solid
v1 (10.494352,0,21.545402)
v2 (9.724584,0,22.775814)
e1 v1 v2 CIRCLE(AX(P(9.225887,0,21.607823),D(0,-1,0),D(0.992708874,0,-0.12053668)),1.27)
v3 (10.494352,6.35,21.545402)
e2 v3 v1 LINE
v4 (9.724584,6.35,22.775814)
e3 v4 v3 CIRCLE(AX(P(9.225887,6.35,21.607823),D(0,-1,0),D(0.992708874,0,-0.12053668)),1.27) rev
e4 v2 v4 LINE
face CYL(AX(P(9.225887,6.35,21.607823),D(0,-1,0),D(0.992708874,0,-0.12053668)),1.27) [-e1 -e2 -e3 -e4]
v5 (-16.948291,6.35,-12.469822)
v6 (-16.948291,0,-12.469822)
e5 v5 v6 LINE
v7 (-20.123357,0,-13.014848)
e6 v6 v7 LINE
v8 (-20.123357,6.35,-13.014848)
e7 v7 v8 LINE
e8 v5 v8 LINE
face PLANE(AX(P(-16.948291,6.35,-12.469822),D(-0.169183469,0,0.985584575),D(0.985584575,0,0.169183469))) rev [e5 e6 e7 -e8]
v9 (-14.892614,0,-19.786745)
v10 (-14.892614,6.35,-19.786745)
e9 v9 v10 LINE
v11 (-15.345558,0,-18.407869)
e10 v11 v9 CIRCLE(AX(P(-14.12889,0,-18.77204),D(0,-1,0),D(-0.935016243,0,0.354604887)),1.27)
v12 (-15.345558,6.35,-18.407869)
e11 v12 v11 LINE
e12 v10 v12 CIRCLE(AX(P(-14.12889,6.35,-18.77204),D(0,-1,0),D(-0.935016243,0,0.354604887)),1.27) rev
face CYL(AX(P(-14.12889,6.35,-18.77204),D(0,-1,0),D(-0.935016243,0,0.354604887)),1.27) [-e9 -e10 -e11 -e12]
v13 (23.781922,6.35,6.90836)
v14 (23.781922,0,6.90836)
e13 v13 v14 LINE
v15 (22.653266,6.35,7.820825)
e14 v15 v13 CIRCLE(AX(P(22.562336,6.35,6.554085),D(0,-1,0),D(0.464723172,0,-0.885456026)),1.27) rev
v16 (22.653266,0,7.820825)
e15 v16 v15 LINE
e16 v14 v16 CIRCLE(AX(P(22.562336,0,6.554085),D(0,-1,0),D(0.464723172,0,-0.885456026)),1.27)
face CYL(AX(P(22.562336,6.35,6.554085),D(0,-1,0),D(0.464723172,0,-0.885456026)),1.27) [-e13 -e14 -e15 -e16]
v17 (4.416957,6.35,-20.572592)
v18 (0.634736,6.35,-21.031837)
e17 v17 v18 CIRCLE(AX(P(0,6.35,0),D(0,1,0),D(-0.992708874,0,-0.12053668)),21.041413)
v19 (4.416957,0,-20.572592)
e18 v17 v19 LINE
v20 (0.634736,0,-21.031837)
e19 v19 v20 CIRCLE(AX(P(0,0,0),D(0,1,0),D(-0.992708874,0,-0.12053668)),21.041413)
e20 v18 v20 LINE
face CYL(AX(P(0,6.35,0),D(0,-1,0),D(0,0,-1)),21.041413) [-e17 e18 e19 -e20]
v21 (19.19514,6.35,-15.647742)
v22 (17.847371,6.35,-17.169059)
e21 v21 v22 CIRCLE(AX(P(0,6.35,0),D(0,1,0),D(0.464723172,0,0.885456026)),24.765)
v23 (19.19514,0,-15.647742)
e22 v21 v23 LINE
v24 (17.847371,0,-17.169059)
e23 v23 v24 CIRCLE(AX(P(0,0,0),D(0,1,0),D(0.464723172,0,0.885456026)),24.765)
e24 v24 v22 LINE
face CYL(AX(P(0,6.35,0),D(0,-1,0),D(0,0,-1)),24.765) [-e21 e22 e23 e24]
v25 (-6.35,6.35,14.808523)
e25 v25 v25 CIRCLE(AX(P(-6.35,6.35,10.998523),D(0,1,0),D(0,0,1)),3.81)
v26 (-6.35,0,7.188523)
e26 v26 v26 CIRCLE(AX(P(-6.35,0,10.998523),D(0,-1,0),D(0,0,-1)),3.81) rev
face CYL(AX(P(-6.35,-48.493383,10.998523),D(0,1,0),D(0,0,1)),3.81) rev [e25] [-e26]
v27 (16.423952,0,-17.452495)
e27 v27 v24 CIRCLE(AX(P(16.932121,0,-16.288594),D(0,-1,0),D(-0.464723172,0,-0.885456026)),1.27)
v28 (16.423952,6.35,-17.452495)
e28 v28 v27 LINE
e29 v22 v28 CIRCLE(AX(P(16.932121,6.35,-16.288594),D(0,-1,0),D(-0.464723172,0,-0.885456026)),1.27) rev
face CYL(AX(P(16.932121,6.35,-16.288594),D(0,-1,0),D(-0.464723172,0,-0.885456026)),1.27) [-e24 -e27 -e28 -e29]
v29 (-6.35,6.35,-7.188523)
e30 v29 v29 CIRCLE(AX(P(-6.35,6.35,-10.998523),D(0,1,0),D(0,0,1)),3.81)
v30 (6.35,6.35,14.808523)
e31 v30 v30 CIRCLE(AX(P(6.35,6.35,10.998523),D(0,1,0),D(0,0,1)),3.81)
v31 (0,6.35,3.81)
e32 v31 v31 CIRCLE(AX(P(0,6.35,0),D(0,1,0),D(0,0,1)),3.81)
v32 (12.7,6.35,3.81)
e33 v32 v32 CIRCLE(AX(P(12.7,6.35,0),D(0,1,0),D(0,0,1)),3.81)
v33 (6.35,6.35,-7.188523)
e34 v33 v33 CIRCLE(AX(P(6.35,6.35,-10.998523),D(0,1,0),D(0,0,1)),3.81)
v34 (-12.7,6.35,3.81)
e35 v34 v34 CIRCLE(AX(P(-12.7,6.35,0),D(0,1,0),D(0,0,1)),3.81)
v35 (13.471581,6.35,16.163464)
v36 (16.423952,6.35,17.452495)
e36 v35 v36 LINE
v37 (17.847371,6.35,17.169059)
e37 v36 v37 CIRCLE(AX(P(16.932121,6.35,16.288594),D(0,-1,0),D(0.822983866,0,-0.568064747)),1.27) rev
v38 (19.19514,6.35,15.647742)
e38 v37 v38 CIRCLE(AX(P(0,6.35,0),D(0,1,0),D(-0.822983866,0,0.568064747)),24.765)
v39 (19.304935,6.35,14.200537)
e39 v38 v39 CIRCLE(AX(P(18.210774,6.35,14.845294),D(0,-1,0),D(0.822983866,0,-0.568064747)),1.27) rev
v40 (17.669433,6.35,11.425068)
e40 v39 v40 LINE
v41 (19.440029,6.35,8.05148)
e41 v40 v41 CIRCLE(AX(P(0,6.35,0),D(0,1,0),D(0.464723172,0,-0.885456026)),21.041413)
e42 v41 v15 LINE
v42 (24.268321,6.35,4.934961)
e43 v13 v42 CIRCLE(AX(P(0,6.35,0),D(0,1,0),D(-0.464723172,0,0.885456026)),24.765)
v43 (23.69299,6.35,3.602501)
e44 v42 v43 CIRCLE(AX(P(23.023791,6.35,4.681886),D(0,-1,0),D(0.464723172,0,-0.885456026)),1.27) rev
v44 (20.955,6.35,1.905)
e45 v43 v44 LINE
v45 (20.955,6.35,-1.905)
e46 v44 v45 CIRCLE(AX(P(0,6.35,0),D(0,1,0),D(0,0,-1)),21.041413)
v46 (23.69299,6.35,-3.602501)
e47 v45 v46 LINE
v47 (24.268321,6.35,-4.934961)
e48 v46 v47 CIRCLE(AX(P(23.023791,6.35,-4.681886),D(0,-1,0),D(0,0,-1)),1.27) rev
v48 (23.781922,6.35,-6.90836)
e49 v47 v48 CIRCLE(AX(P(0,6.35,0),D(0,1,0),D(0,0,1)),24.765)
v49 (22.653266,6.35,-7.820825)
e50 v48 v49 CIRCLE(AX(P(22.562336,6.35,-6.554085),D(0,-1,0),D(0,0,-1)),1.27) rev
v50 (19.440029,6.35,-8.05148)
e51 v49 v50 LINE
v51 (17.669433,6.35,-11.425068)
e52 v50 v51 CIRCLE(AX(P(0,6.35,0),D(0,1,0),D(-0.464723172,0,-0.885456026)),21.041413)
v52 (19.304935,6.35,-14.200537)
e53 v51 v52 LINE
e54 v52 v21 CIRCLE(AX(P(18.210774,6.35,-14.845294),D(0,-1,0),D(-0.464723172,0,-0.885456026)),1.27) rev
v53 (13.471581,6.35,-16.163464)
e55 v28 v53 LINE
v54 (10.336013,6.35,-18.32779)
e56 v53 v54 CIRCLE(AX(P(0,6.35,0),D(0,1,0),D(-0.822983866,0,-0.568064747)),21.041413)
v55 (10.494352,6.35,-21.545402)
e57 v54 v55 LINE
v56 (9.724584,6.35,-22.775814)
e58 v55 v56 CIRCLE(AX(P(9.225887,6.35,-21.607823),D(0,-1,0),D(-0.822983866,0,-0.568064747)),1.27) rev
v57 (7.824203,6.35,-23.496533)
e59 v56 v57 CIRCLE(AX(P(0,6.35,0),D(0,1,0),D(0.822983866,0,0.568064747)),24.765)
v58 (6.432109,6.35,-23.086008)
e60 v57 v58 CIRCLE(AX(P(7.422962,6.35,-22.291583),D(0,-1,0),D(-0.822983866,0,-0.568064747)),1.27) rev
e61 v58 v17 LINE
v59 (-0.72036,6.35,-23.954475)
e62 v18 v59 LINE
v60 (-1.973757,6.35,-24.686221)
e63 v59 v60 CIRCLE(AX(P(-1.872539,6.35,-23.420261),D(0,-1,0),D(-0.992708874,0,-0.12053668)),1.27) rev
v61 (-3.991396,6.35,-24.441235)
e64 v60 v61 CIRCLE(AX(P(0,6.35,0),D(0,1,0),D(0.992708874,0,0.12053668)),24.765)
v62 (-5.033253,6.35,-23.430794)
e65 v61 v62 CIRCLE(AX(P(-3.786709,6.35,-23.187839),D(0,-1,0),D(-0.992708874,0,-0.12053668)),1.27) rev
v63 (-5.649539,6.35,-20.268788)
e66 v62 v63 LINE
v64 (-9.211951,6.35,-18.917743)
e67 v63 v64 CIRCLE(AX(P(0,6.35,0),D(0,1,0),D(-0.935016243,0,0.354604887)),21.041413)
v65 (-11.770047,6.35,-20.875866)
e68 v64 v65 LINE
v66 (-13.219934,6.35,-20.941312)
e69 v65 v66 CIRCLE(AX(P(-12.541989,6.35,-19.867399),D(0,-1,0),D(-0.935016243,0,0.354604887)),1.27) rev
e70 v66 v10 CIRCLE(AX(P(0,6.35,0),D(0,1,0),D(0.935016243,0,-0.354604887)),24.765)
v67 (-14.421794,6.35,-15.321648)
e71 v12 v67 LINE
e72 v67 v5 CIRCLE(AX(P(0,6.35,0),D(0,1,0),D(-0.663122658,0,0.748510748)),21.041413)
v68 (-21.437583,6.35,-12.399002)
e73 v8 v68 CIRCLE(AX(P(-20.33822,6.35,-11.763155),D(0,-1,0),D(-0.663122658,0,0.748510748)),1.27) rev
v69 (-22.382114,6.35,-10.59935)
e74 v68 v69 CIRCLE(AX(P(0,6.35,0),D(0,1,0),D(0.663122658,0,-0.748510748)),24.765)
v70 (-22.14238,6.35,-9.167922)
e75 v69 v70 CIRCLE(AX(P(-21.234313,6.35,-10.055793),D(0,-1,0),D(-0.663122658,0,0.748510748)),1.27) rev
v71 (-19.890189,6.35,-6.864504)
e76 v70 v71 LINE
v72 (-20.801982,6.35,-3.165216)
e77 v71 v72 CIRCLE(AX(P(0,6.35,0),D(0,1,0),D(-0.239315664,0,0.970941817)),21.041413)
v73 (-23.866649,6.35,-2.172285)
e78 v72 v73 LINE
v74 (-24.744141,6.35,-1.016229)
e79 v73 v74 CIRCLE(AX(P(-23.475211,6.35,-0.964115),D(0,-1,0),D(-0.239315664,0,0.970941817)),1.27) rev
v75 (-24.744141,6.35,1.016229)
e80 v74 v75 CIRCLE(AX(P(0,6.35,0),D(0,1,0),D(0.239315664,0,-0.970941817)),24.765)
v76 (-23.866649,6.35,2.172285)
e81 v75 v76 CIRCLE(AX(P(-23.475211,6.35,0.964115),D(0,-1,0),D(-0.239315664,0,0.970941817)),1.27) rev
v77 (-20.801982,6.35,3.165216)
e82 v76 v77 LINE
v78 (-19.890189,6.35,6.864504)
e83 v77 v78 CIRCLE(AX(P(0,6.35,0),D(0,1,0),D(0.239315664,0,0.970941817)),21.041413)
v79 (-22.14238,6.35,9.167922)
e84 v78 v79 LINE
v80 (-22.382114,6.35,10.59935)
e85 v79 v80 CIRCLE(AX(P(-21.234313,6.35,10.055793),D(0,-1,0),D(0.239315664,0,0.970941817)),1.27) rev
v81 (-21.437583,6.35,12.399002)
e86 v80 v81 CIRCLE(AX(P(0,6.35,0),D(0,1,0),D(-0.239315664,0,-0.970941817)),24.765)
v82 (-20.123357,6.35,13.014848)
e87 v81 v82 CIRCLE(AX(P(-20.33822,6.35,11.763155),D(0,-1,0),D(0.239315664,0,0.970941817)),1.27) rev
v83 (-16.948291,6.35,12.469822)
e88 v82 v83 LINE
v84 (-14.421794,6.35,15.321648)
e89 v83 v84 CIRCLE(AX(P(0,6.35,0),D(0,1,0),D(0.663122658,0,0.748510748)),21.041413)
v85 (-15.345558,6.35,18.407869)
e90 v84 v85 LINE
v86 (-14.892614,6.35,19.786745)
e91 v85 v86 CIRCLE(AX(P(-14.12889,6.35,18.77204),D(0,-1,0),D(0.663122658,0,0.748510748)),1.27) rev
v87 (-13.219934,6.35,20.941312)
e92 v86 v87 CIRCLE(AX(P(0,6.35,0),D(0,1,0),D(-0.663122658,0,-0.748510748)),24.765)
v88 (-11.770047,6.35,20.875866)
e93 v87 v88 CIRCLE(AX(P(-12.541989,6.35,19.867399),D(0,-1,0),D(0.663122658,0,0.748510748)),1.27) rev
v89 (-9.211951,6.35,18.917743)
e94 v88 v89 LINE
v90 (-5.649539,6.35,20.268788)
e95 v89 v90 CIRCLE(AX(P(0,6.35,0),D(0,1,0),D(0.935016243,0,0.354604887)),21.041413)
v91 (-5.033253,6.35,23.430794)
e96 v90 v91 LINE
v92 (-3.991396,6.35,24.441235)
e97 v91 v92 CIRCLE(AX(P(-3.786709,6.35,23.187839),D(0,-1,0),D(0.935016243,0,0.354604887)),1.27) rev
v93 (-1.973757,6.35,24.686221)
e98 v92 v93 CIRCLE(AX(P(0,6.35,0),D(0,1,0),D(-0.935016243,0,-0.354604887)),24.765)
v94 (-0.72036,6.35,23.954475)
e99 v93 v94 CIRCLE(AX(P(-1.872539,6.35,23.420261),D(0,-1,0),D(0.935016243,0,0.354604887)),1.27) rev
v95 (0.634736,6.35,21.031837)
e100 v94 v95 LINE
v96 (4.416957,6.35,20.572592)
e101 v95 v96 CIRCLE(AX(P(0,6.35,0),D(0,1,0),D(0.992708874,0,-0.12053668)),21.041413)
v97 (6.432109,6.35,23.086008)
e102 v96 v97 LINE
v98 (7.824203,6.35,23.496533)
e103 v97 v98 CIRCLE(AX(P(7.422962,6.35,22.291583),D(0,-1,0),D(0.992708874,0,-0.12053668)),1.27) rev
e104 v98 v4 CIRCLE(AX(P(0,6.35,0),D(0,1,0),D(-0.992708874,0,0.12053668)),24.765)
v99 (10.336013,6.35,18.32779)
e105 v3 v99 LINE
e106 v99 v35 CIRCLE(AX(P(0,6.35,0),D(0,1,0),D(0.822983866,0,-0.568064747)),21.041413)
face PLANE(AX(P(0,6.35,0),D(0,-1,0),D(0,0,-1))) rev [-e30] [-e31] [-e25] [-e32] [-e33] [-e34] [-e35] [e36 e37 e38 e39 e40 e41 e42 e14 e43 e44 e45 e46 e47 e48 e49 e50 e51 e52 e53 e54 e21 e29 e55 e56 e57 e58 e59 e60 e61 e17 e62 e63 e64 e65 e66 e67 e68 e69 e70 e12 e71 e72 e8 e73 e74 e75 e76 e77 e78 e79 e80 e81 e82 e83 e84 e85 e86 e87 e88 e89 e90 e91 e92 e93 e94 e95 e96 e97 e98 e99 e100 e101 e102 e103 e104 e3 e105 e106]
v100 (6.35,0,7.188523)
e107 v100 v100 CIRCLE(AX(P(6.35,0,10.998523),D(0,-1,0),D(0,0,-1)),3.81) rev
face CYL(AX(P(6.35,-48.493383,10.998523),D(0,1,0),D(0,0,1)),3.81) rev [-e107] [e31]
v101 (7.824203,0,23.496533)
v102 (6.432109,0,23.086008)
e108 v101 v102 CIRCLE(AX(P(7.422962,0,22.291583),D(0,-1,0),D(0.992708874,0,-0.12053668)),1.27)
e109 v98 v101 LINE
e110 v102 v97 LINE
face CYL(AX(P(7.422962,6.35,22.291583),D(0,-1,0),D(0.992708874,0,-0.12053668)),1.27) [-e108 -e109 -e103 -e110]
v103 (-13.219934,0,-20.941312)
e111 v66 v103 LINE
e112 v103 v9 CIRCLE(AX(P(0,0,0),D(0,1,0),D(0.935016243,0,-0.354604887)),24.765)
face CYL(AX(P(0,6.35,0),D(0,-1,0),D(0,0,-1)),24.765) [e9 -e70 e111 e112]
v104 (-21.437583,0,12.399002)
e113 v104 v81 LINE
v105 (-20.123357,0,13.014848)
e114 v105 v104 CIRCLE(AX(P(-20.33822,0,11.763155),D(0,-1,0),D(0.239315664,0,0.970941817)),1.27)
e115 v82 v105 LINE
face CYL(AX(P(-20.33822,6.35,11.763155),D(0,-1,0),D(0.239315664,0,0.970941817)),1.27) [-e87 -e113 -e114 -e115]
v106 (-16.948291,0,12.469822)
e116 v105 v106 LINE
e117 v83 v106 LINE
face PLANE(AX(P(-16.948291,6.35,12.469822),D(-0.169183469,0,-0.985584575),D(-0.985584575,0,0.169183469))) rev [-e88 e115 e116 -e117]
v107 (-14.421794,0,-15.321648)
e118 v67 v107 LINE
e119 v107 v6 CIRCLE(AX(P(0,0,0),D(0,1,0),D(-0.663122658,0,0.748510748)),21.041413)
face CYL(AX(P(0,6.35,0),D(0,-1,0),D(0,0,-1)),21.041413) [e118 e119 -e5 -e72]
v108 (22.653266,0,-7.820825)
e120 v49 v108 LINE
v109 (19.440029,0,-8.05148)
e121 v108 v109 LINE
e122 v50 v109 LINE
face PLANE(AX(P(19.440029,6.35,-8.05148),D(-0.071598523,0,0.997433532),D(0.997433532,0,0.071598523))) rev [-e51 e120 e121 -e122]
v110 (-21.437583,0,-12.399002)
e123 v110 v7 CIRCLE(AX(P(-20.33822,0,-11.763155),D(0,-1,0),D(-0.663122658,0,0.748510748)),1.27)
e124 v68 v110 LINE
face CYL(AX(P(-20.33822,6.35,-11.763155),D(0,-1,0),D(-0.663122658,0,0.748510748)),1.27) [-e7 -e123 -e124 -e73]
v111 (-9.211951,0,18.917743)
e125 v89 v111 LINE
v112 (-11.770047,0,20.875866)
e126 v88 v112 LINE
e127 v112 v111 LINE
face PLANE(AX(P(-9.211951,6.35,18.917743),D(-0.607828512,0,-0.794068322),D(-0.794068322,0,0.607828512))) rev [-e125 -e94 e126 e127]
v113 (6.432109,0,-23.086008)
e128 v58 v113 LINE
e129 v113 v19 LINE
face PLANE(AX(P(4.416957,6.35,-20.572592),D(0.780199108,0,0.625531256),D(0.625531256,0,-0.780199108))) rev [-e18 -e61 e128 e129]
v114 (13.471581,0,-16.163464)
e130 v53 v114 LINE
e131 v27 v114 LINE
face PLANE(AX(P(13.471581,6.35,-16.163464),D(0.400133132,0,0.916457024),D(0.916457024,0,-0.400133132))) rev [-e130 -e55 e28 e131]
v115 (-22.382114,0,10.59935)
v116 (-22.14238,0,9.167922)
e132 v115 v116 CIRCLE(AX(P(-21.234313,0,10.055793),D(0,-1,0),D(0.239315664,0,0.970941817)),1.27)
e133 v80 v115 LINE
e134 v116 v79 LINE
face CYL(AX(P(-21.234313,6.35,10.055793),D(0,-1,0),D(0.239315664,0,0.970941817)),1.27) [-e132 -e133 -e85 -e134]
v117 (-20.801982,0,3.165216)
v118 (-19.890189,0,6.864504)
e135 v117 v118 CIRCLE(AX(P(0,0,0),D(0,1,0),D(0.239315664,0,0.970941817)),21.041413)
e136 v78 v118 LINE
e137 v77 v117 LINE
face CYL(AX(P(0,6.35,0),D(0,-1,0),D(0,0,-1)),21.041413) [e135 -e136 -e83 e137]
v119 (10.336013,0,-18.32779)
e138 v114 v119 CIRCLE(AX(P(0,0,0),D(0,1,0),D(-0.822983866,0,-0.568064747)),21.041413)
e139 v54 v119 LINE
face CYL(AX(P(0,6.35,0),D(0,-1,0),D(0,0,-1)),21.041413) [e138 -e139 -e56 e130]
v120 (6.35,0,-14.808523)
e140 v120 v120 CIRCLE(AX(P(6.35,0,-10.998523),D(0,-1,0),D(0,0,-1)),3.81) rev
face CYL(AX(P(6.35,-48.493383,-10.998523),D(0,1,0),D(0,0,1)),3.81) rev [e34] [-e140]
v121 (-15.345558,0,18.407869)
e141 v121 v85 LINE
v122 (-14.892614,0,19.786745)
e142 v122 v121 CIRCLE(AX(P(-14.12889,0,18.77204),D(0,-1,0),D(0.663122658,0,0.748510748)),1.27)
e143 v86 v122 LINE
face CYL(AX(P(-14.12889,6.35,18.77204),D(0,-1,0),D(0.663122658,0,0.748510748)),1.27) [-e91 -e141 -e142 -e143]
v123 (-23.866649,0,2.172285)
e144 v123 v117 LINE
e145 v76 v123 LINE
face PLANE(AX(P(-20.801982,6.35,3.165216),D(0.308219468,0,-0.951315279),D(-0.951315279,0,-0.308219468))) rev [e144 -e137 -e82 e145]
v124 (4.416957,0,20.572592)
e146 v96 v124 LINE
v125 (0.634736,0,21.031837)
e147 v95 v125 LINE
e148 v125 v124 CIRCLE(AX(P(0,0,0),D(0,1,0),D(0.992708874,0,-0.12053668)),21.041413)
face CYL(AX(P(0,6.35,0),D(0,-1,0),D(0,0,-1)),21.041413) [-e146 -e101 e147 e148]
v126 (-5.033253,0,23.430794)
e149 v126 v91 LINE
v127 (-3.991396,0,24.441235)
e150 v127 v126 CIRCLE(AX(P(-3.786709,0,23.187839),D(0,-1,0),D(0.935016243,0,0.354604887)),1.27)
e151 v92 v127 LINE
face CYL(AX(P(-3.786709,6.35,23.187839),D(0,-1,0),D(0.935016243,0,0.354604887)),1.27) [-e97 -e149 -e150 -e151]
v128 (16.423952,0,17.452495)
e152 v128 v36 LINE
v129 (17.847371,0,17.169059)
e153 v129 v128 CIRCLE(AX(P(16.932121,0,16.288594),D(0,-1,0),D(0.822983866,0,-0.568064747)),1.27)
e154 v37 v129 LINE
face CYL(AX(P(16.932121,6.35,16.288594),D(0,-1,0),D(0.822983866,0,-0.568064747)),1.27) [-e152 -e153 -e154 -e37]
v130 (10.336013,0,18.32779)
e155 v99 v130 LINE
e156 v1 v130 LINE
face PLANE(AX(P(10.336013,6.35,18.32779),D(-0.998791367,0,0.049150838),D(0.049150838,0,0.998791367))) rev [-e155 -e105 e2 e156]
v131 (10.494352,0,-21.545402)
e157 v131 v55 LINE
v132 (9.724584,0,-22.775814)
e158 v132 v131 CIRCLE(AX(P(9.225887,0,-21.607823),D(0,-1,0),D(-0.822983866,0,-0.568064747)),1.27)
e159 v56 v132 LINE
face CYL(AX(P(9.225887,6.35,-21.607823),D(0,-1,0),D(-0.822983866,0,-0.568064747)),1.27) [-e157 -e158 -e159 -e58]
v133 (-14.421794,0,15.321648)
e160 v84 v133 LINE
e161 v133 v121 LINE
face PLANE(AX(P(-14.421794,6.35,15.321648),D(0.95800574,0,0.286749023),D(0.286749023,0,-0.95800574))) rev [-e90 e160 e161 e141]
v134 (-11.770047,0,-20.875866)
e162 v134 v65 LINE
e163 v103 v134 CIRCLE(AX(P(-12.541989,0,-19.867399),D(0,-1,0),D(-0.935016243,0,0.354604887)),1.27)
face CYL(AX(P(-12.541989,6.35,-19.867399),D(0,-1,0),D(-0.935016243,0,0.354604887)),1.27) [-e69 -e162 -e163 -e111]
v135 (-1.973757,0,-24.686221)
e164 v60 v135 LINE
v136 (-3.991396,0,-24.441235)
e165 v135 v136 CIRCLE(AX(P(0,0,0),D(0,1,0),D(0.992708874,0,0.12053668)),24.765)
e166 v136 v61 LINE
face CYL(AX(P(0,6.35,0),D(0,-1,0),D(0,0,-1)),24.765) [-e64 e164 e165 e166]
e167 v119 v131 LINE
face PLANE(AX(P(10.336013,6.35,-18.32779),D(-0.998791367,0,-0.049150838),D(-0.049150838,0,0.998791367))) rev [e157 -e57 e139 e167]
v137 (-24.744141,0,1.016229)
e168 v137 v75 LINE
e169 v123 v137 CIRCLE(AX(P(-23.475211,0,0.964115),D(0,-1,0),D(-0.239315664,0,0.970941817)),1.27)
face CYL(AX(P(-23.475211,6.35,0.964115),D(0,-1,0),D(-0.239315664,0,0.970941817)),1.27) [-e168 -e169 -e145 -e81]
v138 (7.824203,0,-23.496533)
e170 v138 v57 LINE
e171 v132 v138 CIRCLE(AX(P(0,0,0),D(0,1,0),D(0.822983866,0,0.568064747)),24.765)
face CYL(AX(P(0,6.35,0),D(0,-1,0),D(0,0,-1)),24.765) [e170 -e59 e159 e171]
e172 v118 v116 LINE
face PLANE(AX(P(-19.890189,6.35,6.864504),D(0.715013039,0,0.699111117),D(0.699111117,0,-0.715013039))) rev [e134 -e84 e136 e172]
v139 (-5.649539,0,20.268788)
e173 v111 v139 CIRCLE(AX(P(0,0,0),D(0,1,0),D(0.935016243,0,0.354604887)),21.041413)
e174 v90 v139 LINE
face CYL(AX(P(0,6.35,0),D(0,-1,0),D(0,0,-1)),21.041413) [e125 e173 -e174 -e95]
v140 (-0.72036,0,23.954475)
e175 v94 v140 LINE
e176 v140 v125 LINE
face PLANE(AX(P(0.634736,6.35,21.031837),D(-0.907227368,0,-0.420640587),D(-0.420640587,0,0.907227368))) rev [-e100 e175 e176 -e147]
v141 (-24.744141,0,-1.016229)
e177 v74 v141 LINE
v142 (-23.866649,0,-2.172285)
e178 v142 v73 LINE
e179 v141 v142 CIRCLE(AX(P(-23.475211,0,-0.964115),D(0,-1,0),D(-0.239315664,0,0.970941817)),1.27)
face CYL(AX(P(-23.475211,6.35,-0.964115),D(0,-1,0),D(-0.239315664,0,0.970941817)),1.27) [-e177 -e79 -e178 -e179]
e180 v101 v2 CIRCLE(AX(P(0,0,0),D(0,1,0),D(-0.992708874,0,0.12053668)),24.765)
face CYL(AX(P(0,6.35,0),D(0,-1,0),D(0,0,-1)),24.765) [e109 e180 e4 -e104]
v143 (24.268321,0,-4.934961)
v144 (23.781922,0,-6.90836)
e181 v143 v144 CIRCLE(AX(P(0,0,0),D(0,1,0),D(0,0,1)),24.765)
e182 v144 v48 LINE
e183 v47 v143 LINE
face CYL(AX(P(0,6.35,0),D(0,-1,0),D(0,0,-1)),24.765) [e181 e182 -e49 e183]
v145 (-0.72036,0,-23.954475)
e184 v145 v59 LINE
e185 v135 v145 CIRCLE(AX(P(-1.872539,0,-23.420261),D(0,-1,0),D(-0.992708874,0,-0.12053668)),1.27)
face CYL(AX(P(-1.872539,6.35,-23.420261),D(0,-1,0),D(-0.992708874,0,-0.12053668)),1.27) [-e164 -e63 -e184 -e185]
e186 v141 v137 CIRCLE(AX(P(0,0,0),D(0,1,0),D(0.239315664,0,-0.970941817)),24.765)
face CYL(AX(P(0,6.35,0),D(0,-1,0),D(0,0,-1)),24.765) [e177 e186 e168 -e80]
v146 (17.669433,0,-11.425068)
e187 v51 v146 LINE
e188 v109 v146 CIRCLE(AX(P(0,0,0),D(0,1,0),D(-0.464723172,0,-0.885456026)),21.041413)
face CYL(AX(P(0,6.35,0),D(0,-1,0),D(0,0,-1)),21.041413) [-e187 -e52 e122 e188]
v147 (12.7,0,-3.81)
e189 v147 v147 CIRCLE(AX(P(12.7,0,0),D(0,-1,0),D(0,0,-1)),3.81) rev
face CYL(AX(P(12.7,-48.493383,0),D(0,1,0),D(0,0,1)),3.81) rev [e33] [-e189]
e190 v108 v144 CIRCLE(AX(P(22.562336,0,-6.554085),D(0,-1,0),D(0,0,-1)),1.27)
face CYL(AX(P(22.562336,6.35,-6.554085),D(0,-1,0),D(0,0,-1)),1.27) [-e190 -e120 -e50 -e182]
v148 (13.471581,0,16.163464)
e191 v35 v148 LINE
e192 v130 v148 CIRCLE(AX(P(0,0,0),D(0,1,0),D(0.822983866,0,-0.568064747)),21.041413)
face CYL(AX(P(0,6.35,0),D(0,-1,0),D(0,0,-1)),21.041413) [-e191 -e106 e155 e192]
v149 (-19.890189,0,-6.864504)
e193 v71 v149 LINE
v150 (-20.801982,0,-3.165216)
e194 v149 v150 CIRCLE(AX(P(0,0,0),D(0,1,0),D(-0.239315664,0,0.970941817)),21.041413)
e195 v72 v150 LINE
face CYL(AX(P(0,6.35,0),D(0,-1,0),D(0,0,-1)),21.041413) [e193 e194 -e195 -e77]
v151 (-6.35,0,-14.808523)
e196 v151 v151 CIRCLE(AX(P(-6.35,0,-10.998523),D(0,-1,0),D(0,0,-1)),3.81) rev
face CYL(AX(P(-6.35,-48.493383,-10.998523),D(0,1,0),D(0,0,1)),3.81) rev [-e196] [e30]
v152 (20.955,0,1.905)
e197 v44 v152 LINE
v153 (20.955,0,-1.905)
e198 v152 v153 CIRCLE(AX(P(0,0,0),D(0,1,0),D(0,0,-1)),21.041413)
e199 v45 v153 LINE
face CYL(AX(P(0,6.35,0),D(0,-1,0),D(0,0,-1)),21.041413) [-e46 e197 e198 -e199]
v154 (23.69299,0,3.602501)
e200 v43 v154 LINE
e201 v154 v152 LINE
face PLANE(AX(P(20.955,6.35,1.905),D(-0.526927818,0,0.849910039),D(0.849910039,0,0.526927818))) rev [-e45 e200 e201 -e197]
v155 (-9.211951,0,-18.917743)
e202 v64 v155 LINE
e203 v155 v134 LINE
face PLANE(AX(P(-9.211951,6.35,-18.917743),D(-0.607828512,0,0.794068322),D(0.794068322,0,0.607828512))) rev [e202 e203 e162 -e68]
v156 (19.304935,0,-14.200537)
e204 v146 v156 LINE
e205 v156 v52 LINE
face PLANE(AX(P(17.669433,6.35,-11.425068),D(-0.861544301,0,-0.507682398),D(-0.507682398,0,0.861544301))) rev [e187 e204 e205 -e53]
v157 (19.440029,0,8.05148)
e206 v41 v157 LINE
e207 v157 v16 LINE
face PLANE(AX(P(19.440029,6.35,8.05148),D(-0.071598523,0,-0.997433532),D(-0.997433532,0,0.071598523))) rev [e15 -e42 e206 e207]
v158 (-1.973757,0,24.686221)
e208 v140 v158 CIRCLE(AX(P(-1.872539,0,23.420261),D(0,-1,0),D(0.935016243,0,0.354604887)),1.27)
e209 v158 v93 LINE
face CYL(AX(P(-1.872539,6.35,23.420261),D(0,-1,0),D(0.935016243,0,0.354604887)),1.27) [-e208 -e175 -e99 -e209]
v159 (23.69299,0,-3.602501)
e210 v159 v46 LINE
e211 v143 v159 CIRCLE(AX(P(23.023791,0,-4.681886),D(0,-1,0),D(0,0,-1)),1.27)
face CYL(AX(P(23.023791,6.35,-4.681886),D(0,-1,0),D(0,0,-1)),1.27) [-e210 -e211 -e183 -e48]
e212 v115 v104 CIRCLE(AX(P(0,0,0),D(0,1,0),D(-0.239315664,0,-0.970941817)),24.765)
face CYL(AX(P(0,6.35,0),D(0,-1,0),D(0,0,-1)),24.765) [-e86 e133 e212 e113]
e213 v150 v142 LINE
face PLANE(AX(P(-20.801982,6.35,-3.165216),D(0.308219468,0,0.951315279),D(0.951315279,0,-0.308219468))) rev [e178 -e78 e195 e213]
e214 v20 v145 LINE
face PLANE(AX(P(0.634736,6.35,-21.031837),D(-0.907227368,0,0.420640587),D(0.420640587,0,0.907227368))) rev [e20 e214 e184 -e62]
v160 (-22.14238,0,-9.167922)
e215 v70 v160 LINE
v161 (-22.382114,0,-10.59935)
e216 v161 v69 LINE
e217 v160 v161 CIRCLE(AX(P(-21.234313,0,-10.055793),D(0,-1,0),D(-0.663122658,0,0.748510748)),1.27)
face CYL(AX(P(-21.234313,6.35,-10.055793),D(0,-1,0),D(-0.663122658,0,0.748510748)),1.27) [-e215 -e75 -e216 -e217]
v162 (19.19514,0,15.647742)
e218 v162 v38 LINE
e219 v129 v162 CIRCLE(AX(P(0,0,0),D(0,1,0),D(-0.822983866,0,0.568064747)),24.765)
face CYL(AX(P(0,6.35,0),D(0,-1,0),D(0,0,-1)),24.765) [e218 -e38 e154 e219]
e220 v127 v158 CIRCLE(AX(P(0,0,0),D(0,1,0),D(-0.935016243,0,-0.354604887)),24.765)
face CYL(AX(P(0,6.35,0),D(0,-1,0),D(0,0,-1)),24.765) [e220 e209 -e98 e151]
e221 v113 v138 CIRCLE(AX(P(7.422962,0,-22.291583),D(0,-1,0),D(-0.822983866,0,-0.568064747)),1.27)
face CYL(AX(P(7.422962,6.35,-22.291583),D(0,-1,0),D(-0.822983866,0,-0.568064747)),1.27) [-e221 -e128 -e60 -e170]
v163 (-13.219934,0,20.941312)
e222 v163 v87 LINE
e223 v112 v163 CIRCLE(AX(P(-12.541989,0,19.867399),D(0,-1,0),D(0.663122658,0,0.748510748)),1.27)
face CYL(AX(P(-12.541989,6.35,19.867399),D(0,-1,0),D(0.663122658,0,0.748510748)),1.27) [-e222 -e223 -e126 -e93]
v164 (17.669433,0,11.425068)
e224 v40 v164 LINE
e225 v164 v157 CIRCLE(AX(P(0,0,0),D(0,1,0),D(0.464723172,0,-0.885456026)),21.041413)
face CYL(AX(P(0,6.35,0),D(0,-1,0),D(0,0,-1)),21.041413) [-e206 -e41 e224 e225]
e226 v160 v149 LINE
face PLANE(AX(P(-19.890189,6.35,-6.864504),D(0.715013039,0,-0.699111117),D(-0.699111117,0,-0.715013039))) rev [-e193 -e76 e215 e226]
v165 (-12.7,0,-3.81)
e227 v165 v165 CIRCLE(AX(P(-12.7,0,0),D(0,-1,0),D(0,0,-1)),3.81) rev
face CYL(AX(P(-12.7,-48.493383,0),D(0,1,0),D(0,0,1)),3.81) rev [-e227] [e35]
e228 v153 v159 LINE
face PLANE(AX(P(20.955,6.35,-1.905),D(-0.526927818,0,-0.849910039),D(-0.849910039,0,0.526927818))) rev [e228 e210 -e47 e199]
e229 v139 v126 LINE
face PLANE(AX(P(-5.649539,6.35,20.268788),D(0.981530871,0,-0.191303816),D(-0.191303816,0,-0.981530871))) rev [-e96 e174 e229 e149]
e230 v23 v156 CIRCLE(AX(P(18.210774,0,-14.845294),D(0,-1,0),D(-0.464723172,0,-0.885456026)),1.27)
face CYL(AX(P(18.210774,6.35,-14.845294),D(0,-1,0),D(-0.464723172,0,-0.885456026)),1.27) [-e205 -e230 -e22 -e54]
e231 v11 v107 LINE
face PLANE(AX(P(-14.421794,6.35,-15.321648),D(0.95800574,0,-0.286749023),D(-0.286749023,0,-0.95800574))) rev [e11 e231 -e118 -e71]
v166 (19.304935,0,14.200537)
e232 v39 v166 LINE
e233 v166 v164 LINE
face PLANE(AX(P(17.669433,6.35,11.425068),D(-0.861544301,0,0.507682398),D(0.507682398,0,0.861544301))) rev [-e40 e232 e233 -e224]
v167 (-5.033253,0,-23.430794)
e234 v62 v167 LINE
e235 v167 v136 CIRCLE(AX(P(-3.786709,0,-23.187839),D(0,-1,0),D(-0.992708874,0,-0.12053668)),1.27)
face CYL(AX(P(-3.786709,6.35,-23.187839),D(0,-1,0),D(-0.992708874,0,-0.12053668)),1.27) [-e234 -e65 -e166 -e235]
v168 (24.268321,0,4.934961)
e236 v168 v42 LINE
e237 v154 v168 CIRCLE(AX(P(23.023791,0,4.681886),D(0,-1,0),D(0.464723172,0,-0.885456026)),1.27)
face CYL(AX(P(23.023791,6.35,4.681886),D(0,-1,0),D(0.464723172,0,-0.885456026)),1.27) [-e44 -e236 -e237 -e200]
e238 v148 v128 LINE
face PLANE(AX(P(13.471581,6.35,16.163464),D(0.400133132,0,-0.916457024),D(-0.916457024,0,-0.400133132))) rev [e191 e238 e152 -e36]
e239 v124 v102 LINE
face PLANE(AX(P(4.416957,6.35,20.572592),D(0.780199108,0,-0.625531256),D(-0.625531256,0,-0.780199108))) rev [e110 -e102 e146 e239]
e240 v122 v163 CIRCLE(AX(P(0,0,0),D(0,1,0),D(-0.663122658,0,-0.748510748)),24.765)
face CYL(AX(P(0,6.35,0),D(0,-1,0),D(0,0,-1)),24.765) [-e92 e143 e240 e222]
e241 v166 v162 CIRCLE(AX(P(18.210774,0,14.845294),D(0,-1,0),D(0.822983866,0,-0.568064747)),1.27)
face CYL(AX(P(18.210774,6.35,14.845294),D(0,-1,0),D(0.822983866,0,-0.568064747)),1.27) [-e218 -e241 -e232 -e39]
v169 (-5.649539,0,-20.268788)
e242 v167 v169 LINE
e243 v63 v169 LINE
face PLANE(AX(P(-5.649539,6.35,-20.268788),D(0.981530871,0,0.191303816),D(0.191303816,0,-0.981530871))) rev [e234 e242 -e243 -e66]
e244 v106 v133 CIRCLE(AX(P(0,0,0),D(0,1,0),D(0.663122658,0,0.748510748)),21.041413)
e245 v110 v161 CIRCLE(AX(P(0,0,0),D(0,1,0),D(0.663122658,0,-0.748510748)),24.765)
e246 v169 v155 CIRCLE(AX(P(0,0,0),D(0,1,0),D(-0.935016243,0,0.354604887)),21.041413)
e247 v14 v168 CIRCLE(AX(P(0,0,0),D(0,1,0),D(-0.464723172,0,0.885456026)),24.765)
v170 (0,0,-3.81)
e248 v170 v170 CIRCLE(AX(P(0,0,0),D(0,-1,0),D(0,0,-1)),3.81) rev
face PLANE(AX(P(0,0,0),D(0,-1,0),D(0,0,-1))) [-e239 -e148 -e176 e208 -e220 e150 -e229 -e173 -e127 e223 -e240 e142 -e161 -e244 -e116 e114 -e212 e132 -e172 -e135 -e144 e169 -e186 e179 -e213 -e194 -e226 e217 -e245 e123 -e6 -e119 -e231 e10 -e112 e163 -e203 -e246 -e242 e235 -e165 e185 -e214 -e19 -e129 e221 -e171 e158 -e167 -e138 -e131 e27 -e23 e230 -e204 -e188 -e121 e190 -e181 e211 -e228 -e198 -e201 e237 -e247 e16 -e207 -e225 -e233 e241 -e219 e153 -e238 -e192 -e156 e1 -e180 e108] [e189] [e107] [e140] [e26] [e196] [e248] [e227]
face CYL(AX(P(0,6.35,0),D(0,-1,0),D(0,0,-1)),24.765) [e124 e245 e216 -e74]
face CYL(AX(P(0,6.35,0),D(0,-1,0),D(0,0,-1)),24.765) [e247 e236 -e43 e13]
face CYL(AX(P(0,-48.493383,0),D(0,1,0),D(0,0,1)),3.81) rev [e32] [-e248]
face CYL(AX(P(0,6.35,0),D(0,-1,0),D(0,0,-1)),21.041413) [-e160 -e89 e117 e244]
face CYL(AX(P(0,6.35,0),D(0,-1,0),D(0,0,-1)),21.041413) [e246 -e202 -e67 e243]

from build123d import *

# Parameters (mm, degrees)
TOOTH_DEPTH       = 6.35
CIRPATTERN2_COUNT = 13
FILLET1_START     = -1
FILLET1_DEPTH     = 8
CIRPATTERN4_COUNT = 13
BEARING_START     = -6.35
SKETCH2_R         = 17.145
SKETCH2_R_2       = 3.81
BEARING_DEPTH     = 6.35


with BuildPart() as part:
    # Sketch1 → tooth (new body)
    with BuildSketch(Plane(origin=(0, 0, 0), x_dir=(1, 0, 0), z_dir=(0, 1, 0))):
        with BuildLine():
            Line((20.955, 1.905), (24.430024666, 4.059448215))
            ThreePointArc((24.430024666, 4.059448215), (24.045374001, 5.92665286), (23.518231918, 7.758736523))
            Line((23.518231918, 7.758736523), (16.281852867, 5.371432977))
            ThreePointArc((16.281852867, 5.371432977), (17.094199899, 1.318846017), (16.913093955, -2.810387497))
            Line((16.913093955, -2.810387497), (24.430024666, -4.059448215))
            Line((24.430024666, -4.059448215), (20.955, -1.905))
            ThreePointArc((20.955, -1.905), (21.041412738, 0), (20.955, 1.905))
        make_face()
    tooth = extrude(amount=TOOTH_DEPTH)

    # CirPattern2: tooth ×13 about axis
    cirpattern2_axis = Axis((0, 0, 0), (0, 1, 0))
    for i in range(1, CIRPATTERN2_COUNT):
        add(tooth.rotate(cirpattern2_axis, i * 360 / CIRPATTERN2_COUNT))

    # Fillet1: read off the stored shape, not the designer's step
    # Fillet1 outline → Fillet1 (cut)
    with BuildSketch(Plane(origin=(0, 0, 0), x_dir=(1, 0, 0), z_dir=(0, 1, 0)).offset(FILLET1_START)):
        with BuildLine():
            Line((23.518231918, 7.758736523), (22.653265955, 7.820825329))
            ThreePointArc((22.653265955, 7.820825329), (23.360778925, 7.541702395), (23.781921552, 6.908359594))
            ThreePointArc((23.781921552, 6.908359594), (23.653898512, 7.334733136), (23.518231918, 7.758736523))
        make_face()
        with BuildLine():
            ThreePointArc((24.430024666, 4.059448215), (24.353107335, 4.497931535), (24.268320524, 4.934961391))
            ThreePointArc((24.268320524, 4.934961391), (24.189746323, 4.178449454), (23.692989596, 3.602500698))
            Line((23.692989596, 3.602500698), (24.430024666, 4.059448215))
        make_face()
    fillet1 = extrude(amount=FILLET1_DEPTH, mode=Mode.SUBTRACT)

    # CirPattern4: Fillet1 ×13 about axis
    cirpattern4_axis = Axis((0, 0, 0), (0, 1, 0))
    for i in range(1, CIRPATTERN4_COUNT):
        add(fillet1.rotate(cirpattern4_axis, i * 360 / CIRPATTERN4_COUNT), mode=Mode.SUBTRACT)

    # Sketch2 → bearing (add)
    with BuildSketch(Plane(origin=(0, 6.35, 0), x_dir=(1, 0, 0), z_dir=(0, 1, 0)).offset(BEARING_START)):
        Circle(SKETCH2_R)
        with Locations(Location((0, 0, 0), (0, 0, 270))):
            Circle(SKETCH2_R_2, mode=Mode.SUBTRACT)
        with Locations(Location((12.7, 0, 0), (0, 0, 270))):
            Circle(SKETCH2_R_2, mode=Mode.SUBTRACT)
        with Locations(Location((6.35, -10.998522628, 0), (0, 0, 270))):
            Circle(SKETCH2_R_2, mode=Mode.SUBTRACT)
        with Locations(Location((-6.35, -10.998522628, 0), (0, 0, 270))):
            Circle(SKETCH2_R_2, mode=Mode.SUBTRACT)
        with Locations(Location((-12.7, 0, 0), (0, 0, 270))):
            Circle(SKETCH2_R_2, mode=Mode.SUBTRACT)
        with Locations(Location((-6.35, 10.998522628, 0), (0, 0, 270))):
            Circle(SKETCH2_R_2, mode=Mode.SUBTRACT)
        with Locations(Location((6.35, 10.998522628, 0), (0, 0, 270))):
            Circle(SKETCH2_R_2, mode=Mode.SUBTRACT)
    extrude(amount=BEARING_DEPTH)


solid = part.part
